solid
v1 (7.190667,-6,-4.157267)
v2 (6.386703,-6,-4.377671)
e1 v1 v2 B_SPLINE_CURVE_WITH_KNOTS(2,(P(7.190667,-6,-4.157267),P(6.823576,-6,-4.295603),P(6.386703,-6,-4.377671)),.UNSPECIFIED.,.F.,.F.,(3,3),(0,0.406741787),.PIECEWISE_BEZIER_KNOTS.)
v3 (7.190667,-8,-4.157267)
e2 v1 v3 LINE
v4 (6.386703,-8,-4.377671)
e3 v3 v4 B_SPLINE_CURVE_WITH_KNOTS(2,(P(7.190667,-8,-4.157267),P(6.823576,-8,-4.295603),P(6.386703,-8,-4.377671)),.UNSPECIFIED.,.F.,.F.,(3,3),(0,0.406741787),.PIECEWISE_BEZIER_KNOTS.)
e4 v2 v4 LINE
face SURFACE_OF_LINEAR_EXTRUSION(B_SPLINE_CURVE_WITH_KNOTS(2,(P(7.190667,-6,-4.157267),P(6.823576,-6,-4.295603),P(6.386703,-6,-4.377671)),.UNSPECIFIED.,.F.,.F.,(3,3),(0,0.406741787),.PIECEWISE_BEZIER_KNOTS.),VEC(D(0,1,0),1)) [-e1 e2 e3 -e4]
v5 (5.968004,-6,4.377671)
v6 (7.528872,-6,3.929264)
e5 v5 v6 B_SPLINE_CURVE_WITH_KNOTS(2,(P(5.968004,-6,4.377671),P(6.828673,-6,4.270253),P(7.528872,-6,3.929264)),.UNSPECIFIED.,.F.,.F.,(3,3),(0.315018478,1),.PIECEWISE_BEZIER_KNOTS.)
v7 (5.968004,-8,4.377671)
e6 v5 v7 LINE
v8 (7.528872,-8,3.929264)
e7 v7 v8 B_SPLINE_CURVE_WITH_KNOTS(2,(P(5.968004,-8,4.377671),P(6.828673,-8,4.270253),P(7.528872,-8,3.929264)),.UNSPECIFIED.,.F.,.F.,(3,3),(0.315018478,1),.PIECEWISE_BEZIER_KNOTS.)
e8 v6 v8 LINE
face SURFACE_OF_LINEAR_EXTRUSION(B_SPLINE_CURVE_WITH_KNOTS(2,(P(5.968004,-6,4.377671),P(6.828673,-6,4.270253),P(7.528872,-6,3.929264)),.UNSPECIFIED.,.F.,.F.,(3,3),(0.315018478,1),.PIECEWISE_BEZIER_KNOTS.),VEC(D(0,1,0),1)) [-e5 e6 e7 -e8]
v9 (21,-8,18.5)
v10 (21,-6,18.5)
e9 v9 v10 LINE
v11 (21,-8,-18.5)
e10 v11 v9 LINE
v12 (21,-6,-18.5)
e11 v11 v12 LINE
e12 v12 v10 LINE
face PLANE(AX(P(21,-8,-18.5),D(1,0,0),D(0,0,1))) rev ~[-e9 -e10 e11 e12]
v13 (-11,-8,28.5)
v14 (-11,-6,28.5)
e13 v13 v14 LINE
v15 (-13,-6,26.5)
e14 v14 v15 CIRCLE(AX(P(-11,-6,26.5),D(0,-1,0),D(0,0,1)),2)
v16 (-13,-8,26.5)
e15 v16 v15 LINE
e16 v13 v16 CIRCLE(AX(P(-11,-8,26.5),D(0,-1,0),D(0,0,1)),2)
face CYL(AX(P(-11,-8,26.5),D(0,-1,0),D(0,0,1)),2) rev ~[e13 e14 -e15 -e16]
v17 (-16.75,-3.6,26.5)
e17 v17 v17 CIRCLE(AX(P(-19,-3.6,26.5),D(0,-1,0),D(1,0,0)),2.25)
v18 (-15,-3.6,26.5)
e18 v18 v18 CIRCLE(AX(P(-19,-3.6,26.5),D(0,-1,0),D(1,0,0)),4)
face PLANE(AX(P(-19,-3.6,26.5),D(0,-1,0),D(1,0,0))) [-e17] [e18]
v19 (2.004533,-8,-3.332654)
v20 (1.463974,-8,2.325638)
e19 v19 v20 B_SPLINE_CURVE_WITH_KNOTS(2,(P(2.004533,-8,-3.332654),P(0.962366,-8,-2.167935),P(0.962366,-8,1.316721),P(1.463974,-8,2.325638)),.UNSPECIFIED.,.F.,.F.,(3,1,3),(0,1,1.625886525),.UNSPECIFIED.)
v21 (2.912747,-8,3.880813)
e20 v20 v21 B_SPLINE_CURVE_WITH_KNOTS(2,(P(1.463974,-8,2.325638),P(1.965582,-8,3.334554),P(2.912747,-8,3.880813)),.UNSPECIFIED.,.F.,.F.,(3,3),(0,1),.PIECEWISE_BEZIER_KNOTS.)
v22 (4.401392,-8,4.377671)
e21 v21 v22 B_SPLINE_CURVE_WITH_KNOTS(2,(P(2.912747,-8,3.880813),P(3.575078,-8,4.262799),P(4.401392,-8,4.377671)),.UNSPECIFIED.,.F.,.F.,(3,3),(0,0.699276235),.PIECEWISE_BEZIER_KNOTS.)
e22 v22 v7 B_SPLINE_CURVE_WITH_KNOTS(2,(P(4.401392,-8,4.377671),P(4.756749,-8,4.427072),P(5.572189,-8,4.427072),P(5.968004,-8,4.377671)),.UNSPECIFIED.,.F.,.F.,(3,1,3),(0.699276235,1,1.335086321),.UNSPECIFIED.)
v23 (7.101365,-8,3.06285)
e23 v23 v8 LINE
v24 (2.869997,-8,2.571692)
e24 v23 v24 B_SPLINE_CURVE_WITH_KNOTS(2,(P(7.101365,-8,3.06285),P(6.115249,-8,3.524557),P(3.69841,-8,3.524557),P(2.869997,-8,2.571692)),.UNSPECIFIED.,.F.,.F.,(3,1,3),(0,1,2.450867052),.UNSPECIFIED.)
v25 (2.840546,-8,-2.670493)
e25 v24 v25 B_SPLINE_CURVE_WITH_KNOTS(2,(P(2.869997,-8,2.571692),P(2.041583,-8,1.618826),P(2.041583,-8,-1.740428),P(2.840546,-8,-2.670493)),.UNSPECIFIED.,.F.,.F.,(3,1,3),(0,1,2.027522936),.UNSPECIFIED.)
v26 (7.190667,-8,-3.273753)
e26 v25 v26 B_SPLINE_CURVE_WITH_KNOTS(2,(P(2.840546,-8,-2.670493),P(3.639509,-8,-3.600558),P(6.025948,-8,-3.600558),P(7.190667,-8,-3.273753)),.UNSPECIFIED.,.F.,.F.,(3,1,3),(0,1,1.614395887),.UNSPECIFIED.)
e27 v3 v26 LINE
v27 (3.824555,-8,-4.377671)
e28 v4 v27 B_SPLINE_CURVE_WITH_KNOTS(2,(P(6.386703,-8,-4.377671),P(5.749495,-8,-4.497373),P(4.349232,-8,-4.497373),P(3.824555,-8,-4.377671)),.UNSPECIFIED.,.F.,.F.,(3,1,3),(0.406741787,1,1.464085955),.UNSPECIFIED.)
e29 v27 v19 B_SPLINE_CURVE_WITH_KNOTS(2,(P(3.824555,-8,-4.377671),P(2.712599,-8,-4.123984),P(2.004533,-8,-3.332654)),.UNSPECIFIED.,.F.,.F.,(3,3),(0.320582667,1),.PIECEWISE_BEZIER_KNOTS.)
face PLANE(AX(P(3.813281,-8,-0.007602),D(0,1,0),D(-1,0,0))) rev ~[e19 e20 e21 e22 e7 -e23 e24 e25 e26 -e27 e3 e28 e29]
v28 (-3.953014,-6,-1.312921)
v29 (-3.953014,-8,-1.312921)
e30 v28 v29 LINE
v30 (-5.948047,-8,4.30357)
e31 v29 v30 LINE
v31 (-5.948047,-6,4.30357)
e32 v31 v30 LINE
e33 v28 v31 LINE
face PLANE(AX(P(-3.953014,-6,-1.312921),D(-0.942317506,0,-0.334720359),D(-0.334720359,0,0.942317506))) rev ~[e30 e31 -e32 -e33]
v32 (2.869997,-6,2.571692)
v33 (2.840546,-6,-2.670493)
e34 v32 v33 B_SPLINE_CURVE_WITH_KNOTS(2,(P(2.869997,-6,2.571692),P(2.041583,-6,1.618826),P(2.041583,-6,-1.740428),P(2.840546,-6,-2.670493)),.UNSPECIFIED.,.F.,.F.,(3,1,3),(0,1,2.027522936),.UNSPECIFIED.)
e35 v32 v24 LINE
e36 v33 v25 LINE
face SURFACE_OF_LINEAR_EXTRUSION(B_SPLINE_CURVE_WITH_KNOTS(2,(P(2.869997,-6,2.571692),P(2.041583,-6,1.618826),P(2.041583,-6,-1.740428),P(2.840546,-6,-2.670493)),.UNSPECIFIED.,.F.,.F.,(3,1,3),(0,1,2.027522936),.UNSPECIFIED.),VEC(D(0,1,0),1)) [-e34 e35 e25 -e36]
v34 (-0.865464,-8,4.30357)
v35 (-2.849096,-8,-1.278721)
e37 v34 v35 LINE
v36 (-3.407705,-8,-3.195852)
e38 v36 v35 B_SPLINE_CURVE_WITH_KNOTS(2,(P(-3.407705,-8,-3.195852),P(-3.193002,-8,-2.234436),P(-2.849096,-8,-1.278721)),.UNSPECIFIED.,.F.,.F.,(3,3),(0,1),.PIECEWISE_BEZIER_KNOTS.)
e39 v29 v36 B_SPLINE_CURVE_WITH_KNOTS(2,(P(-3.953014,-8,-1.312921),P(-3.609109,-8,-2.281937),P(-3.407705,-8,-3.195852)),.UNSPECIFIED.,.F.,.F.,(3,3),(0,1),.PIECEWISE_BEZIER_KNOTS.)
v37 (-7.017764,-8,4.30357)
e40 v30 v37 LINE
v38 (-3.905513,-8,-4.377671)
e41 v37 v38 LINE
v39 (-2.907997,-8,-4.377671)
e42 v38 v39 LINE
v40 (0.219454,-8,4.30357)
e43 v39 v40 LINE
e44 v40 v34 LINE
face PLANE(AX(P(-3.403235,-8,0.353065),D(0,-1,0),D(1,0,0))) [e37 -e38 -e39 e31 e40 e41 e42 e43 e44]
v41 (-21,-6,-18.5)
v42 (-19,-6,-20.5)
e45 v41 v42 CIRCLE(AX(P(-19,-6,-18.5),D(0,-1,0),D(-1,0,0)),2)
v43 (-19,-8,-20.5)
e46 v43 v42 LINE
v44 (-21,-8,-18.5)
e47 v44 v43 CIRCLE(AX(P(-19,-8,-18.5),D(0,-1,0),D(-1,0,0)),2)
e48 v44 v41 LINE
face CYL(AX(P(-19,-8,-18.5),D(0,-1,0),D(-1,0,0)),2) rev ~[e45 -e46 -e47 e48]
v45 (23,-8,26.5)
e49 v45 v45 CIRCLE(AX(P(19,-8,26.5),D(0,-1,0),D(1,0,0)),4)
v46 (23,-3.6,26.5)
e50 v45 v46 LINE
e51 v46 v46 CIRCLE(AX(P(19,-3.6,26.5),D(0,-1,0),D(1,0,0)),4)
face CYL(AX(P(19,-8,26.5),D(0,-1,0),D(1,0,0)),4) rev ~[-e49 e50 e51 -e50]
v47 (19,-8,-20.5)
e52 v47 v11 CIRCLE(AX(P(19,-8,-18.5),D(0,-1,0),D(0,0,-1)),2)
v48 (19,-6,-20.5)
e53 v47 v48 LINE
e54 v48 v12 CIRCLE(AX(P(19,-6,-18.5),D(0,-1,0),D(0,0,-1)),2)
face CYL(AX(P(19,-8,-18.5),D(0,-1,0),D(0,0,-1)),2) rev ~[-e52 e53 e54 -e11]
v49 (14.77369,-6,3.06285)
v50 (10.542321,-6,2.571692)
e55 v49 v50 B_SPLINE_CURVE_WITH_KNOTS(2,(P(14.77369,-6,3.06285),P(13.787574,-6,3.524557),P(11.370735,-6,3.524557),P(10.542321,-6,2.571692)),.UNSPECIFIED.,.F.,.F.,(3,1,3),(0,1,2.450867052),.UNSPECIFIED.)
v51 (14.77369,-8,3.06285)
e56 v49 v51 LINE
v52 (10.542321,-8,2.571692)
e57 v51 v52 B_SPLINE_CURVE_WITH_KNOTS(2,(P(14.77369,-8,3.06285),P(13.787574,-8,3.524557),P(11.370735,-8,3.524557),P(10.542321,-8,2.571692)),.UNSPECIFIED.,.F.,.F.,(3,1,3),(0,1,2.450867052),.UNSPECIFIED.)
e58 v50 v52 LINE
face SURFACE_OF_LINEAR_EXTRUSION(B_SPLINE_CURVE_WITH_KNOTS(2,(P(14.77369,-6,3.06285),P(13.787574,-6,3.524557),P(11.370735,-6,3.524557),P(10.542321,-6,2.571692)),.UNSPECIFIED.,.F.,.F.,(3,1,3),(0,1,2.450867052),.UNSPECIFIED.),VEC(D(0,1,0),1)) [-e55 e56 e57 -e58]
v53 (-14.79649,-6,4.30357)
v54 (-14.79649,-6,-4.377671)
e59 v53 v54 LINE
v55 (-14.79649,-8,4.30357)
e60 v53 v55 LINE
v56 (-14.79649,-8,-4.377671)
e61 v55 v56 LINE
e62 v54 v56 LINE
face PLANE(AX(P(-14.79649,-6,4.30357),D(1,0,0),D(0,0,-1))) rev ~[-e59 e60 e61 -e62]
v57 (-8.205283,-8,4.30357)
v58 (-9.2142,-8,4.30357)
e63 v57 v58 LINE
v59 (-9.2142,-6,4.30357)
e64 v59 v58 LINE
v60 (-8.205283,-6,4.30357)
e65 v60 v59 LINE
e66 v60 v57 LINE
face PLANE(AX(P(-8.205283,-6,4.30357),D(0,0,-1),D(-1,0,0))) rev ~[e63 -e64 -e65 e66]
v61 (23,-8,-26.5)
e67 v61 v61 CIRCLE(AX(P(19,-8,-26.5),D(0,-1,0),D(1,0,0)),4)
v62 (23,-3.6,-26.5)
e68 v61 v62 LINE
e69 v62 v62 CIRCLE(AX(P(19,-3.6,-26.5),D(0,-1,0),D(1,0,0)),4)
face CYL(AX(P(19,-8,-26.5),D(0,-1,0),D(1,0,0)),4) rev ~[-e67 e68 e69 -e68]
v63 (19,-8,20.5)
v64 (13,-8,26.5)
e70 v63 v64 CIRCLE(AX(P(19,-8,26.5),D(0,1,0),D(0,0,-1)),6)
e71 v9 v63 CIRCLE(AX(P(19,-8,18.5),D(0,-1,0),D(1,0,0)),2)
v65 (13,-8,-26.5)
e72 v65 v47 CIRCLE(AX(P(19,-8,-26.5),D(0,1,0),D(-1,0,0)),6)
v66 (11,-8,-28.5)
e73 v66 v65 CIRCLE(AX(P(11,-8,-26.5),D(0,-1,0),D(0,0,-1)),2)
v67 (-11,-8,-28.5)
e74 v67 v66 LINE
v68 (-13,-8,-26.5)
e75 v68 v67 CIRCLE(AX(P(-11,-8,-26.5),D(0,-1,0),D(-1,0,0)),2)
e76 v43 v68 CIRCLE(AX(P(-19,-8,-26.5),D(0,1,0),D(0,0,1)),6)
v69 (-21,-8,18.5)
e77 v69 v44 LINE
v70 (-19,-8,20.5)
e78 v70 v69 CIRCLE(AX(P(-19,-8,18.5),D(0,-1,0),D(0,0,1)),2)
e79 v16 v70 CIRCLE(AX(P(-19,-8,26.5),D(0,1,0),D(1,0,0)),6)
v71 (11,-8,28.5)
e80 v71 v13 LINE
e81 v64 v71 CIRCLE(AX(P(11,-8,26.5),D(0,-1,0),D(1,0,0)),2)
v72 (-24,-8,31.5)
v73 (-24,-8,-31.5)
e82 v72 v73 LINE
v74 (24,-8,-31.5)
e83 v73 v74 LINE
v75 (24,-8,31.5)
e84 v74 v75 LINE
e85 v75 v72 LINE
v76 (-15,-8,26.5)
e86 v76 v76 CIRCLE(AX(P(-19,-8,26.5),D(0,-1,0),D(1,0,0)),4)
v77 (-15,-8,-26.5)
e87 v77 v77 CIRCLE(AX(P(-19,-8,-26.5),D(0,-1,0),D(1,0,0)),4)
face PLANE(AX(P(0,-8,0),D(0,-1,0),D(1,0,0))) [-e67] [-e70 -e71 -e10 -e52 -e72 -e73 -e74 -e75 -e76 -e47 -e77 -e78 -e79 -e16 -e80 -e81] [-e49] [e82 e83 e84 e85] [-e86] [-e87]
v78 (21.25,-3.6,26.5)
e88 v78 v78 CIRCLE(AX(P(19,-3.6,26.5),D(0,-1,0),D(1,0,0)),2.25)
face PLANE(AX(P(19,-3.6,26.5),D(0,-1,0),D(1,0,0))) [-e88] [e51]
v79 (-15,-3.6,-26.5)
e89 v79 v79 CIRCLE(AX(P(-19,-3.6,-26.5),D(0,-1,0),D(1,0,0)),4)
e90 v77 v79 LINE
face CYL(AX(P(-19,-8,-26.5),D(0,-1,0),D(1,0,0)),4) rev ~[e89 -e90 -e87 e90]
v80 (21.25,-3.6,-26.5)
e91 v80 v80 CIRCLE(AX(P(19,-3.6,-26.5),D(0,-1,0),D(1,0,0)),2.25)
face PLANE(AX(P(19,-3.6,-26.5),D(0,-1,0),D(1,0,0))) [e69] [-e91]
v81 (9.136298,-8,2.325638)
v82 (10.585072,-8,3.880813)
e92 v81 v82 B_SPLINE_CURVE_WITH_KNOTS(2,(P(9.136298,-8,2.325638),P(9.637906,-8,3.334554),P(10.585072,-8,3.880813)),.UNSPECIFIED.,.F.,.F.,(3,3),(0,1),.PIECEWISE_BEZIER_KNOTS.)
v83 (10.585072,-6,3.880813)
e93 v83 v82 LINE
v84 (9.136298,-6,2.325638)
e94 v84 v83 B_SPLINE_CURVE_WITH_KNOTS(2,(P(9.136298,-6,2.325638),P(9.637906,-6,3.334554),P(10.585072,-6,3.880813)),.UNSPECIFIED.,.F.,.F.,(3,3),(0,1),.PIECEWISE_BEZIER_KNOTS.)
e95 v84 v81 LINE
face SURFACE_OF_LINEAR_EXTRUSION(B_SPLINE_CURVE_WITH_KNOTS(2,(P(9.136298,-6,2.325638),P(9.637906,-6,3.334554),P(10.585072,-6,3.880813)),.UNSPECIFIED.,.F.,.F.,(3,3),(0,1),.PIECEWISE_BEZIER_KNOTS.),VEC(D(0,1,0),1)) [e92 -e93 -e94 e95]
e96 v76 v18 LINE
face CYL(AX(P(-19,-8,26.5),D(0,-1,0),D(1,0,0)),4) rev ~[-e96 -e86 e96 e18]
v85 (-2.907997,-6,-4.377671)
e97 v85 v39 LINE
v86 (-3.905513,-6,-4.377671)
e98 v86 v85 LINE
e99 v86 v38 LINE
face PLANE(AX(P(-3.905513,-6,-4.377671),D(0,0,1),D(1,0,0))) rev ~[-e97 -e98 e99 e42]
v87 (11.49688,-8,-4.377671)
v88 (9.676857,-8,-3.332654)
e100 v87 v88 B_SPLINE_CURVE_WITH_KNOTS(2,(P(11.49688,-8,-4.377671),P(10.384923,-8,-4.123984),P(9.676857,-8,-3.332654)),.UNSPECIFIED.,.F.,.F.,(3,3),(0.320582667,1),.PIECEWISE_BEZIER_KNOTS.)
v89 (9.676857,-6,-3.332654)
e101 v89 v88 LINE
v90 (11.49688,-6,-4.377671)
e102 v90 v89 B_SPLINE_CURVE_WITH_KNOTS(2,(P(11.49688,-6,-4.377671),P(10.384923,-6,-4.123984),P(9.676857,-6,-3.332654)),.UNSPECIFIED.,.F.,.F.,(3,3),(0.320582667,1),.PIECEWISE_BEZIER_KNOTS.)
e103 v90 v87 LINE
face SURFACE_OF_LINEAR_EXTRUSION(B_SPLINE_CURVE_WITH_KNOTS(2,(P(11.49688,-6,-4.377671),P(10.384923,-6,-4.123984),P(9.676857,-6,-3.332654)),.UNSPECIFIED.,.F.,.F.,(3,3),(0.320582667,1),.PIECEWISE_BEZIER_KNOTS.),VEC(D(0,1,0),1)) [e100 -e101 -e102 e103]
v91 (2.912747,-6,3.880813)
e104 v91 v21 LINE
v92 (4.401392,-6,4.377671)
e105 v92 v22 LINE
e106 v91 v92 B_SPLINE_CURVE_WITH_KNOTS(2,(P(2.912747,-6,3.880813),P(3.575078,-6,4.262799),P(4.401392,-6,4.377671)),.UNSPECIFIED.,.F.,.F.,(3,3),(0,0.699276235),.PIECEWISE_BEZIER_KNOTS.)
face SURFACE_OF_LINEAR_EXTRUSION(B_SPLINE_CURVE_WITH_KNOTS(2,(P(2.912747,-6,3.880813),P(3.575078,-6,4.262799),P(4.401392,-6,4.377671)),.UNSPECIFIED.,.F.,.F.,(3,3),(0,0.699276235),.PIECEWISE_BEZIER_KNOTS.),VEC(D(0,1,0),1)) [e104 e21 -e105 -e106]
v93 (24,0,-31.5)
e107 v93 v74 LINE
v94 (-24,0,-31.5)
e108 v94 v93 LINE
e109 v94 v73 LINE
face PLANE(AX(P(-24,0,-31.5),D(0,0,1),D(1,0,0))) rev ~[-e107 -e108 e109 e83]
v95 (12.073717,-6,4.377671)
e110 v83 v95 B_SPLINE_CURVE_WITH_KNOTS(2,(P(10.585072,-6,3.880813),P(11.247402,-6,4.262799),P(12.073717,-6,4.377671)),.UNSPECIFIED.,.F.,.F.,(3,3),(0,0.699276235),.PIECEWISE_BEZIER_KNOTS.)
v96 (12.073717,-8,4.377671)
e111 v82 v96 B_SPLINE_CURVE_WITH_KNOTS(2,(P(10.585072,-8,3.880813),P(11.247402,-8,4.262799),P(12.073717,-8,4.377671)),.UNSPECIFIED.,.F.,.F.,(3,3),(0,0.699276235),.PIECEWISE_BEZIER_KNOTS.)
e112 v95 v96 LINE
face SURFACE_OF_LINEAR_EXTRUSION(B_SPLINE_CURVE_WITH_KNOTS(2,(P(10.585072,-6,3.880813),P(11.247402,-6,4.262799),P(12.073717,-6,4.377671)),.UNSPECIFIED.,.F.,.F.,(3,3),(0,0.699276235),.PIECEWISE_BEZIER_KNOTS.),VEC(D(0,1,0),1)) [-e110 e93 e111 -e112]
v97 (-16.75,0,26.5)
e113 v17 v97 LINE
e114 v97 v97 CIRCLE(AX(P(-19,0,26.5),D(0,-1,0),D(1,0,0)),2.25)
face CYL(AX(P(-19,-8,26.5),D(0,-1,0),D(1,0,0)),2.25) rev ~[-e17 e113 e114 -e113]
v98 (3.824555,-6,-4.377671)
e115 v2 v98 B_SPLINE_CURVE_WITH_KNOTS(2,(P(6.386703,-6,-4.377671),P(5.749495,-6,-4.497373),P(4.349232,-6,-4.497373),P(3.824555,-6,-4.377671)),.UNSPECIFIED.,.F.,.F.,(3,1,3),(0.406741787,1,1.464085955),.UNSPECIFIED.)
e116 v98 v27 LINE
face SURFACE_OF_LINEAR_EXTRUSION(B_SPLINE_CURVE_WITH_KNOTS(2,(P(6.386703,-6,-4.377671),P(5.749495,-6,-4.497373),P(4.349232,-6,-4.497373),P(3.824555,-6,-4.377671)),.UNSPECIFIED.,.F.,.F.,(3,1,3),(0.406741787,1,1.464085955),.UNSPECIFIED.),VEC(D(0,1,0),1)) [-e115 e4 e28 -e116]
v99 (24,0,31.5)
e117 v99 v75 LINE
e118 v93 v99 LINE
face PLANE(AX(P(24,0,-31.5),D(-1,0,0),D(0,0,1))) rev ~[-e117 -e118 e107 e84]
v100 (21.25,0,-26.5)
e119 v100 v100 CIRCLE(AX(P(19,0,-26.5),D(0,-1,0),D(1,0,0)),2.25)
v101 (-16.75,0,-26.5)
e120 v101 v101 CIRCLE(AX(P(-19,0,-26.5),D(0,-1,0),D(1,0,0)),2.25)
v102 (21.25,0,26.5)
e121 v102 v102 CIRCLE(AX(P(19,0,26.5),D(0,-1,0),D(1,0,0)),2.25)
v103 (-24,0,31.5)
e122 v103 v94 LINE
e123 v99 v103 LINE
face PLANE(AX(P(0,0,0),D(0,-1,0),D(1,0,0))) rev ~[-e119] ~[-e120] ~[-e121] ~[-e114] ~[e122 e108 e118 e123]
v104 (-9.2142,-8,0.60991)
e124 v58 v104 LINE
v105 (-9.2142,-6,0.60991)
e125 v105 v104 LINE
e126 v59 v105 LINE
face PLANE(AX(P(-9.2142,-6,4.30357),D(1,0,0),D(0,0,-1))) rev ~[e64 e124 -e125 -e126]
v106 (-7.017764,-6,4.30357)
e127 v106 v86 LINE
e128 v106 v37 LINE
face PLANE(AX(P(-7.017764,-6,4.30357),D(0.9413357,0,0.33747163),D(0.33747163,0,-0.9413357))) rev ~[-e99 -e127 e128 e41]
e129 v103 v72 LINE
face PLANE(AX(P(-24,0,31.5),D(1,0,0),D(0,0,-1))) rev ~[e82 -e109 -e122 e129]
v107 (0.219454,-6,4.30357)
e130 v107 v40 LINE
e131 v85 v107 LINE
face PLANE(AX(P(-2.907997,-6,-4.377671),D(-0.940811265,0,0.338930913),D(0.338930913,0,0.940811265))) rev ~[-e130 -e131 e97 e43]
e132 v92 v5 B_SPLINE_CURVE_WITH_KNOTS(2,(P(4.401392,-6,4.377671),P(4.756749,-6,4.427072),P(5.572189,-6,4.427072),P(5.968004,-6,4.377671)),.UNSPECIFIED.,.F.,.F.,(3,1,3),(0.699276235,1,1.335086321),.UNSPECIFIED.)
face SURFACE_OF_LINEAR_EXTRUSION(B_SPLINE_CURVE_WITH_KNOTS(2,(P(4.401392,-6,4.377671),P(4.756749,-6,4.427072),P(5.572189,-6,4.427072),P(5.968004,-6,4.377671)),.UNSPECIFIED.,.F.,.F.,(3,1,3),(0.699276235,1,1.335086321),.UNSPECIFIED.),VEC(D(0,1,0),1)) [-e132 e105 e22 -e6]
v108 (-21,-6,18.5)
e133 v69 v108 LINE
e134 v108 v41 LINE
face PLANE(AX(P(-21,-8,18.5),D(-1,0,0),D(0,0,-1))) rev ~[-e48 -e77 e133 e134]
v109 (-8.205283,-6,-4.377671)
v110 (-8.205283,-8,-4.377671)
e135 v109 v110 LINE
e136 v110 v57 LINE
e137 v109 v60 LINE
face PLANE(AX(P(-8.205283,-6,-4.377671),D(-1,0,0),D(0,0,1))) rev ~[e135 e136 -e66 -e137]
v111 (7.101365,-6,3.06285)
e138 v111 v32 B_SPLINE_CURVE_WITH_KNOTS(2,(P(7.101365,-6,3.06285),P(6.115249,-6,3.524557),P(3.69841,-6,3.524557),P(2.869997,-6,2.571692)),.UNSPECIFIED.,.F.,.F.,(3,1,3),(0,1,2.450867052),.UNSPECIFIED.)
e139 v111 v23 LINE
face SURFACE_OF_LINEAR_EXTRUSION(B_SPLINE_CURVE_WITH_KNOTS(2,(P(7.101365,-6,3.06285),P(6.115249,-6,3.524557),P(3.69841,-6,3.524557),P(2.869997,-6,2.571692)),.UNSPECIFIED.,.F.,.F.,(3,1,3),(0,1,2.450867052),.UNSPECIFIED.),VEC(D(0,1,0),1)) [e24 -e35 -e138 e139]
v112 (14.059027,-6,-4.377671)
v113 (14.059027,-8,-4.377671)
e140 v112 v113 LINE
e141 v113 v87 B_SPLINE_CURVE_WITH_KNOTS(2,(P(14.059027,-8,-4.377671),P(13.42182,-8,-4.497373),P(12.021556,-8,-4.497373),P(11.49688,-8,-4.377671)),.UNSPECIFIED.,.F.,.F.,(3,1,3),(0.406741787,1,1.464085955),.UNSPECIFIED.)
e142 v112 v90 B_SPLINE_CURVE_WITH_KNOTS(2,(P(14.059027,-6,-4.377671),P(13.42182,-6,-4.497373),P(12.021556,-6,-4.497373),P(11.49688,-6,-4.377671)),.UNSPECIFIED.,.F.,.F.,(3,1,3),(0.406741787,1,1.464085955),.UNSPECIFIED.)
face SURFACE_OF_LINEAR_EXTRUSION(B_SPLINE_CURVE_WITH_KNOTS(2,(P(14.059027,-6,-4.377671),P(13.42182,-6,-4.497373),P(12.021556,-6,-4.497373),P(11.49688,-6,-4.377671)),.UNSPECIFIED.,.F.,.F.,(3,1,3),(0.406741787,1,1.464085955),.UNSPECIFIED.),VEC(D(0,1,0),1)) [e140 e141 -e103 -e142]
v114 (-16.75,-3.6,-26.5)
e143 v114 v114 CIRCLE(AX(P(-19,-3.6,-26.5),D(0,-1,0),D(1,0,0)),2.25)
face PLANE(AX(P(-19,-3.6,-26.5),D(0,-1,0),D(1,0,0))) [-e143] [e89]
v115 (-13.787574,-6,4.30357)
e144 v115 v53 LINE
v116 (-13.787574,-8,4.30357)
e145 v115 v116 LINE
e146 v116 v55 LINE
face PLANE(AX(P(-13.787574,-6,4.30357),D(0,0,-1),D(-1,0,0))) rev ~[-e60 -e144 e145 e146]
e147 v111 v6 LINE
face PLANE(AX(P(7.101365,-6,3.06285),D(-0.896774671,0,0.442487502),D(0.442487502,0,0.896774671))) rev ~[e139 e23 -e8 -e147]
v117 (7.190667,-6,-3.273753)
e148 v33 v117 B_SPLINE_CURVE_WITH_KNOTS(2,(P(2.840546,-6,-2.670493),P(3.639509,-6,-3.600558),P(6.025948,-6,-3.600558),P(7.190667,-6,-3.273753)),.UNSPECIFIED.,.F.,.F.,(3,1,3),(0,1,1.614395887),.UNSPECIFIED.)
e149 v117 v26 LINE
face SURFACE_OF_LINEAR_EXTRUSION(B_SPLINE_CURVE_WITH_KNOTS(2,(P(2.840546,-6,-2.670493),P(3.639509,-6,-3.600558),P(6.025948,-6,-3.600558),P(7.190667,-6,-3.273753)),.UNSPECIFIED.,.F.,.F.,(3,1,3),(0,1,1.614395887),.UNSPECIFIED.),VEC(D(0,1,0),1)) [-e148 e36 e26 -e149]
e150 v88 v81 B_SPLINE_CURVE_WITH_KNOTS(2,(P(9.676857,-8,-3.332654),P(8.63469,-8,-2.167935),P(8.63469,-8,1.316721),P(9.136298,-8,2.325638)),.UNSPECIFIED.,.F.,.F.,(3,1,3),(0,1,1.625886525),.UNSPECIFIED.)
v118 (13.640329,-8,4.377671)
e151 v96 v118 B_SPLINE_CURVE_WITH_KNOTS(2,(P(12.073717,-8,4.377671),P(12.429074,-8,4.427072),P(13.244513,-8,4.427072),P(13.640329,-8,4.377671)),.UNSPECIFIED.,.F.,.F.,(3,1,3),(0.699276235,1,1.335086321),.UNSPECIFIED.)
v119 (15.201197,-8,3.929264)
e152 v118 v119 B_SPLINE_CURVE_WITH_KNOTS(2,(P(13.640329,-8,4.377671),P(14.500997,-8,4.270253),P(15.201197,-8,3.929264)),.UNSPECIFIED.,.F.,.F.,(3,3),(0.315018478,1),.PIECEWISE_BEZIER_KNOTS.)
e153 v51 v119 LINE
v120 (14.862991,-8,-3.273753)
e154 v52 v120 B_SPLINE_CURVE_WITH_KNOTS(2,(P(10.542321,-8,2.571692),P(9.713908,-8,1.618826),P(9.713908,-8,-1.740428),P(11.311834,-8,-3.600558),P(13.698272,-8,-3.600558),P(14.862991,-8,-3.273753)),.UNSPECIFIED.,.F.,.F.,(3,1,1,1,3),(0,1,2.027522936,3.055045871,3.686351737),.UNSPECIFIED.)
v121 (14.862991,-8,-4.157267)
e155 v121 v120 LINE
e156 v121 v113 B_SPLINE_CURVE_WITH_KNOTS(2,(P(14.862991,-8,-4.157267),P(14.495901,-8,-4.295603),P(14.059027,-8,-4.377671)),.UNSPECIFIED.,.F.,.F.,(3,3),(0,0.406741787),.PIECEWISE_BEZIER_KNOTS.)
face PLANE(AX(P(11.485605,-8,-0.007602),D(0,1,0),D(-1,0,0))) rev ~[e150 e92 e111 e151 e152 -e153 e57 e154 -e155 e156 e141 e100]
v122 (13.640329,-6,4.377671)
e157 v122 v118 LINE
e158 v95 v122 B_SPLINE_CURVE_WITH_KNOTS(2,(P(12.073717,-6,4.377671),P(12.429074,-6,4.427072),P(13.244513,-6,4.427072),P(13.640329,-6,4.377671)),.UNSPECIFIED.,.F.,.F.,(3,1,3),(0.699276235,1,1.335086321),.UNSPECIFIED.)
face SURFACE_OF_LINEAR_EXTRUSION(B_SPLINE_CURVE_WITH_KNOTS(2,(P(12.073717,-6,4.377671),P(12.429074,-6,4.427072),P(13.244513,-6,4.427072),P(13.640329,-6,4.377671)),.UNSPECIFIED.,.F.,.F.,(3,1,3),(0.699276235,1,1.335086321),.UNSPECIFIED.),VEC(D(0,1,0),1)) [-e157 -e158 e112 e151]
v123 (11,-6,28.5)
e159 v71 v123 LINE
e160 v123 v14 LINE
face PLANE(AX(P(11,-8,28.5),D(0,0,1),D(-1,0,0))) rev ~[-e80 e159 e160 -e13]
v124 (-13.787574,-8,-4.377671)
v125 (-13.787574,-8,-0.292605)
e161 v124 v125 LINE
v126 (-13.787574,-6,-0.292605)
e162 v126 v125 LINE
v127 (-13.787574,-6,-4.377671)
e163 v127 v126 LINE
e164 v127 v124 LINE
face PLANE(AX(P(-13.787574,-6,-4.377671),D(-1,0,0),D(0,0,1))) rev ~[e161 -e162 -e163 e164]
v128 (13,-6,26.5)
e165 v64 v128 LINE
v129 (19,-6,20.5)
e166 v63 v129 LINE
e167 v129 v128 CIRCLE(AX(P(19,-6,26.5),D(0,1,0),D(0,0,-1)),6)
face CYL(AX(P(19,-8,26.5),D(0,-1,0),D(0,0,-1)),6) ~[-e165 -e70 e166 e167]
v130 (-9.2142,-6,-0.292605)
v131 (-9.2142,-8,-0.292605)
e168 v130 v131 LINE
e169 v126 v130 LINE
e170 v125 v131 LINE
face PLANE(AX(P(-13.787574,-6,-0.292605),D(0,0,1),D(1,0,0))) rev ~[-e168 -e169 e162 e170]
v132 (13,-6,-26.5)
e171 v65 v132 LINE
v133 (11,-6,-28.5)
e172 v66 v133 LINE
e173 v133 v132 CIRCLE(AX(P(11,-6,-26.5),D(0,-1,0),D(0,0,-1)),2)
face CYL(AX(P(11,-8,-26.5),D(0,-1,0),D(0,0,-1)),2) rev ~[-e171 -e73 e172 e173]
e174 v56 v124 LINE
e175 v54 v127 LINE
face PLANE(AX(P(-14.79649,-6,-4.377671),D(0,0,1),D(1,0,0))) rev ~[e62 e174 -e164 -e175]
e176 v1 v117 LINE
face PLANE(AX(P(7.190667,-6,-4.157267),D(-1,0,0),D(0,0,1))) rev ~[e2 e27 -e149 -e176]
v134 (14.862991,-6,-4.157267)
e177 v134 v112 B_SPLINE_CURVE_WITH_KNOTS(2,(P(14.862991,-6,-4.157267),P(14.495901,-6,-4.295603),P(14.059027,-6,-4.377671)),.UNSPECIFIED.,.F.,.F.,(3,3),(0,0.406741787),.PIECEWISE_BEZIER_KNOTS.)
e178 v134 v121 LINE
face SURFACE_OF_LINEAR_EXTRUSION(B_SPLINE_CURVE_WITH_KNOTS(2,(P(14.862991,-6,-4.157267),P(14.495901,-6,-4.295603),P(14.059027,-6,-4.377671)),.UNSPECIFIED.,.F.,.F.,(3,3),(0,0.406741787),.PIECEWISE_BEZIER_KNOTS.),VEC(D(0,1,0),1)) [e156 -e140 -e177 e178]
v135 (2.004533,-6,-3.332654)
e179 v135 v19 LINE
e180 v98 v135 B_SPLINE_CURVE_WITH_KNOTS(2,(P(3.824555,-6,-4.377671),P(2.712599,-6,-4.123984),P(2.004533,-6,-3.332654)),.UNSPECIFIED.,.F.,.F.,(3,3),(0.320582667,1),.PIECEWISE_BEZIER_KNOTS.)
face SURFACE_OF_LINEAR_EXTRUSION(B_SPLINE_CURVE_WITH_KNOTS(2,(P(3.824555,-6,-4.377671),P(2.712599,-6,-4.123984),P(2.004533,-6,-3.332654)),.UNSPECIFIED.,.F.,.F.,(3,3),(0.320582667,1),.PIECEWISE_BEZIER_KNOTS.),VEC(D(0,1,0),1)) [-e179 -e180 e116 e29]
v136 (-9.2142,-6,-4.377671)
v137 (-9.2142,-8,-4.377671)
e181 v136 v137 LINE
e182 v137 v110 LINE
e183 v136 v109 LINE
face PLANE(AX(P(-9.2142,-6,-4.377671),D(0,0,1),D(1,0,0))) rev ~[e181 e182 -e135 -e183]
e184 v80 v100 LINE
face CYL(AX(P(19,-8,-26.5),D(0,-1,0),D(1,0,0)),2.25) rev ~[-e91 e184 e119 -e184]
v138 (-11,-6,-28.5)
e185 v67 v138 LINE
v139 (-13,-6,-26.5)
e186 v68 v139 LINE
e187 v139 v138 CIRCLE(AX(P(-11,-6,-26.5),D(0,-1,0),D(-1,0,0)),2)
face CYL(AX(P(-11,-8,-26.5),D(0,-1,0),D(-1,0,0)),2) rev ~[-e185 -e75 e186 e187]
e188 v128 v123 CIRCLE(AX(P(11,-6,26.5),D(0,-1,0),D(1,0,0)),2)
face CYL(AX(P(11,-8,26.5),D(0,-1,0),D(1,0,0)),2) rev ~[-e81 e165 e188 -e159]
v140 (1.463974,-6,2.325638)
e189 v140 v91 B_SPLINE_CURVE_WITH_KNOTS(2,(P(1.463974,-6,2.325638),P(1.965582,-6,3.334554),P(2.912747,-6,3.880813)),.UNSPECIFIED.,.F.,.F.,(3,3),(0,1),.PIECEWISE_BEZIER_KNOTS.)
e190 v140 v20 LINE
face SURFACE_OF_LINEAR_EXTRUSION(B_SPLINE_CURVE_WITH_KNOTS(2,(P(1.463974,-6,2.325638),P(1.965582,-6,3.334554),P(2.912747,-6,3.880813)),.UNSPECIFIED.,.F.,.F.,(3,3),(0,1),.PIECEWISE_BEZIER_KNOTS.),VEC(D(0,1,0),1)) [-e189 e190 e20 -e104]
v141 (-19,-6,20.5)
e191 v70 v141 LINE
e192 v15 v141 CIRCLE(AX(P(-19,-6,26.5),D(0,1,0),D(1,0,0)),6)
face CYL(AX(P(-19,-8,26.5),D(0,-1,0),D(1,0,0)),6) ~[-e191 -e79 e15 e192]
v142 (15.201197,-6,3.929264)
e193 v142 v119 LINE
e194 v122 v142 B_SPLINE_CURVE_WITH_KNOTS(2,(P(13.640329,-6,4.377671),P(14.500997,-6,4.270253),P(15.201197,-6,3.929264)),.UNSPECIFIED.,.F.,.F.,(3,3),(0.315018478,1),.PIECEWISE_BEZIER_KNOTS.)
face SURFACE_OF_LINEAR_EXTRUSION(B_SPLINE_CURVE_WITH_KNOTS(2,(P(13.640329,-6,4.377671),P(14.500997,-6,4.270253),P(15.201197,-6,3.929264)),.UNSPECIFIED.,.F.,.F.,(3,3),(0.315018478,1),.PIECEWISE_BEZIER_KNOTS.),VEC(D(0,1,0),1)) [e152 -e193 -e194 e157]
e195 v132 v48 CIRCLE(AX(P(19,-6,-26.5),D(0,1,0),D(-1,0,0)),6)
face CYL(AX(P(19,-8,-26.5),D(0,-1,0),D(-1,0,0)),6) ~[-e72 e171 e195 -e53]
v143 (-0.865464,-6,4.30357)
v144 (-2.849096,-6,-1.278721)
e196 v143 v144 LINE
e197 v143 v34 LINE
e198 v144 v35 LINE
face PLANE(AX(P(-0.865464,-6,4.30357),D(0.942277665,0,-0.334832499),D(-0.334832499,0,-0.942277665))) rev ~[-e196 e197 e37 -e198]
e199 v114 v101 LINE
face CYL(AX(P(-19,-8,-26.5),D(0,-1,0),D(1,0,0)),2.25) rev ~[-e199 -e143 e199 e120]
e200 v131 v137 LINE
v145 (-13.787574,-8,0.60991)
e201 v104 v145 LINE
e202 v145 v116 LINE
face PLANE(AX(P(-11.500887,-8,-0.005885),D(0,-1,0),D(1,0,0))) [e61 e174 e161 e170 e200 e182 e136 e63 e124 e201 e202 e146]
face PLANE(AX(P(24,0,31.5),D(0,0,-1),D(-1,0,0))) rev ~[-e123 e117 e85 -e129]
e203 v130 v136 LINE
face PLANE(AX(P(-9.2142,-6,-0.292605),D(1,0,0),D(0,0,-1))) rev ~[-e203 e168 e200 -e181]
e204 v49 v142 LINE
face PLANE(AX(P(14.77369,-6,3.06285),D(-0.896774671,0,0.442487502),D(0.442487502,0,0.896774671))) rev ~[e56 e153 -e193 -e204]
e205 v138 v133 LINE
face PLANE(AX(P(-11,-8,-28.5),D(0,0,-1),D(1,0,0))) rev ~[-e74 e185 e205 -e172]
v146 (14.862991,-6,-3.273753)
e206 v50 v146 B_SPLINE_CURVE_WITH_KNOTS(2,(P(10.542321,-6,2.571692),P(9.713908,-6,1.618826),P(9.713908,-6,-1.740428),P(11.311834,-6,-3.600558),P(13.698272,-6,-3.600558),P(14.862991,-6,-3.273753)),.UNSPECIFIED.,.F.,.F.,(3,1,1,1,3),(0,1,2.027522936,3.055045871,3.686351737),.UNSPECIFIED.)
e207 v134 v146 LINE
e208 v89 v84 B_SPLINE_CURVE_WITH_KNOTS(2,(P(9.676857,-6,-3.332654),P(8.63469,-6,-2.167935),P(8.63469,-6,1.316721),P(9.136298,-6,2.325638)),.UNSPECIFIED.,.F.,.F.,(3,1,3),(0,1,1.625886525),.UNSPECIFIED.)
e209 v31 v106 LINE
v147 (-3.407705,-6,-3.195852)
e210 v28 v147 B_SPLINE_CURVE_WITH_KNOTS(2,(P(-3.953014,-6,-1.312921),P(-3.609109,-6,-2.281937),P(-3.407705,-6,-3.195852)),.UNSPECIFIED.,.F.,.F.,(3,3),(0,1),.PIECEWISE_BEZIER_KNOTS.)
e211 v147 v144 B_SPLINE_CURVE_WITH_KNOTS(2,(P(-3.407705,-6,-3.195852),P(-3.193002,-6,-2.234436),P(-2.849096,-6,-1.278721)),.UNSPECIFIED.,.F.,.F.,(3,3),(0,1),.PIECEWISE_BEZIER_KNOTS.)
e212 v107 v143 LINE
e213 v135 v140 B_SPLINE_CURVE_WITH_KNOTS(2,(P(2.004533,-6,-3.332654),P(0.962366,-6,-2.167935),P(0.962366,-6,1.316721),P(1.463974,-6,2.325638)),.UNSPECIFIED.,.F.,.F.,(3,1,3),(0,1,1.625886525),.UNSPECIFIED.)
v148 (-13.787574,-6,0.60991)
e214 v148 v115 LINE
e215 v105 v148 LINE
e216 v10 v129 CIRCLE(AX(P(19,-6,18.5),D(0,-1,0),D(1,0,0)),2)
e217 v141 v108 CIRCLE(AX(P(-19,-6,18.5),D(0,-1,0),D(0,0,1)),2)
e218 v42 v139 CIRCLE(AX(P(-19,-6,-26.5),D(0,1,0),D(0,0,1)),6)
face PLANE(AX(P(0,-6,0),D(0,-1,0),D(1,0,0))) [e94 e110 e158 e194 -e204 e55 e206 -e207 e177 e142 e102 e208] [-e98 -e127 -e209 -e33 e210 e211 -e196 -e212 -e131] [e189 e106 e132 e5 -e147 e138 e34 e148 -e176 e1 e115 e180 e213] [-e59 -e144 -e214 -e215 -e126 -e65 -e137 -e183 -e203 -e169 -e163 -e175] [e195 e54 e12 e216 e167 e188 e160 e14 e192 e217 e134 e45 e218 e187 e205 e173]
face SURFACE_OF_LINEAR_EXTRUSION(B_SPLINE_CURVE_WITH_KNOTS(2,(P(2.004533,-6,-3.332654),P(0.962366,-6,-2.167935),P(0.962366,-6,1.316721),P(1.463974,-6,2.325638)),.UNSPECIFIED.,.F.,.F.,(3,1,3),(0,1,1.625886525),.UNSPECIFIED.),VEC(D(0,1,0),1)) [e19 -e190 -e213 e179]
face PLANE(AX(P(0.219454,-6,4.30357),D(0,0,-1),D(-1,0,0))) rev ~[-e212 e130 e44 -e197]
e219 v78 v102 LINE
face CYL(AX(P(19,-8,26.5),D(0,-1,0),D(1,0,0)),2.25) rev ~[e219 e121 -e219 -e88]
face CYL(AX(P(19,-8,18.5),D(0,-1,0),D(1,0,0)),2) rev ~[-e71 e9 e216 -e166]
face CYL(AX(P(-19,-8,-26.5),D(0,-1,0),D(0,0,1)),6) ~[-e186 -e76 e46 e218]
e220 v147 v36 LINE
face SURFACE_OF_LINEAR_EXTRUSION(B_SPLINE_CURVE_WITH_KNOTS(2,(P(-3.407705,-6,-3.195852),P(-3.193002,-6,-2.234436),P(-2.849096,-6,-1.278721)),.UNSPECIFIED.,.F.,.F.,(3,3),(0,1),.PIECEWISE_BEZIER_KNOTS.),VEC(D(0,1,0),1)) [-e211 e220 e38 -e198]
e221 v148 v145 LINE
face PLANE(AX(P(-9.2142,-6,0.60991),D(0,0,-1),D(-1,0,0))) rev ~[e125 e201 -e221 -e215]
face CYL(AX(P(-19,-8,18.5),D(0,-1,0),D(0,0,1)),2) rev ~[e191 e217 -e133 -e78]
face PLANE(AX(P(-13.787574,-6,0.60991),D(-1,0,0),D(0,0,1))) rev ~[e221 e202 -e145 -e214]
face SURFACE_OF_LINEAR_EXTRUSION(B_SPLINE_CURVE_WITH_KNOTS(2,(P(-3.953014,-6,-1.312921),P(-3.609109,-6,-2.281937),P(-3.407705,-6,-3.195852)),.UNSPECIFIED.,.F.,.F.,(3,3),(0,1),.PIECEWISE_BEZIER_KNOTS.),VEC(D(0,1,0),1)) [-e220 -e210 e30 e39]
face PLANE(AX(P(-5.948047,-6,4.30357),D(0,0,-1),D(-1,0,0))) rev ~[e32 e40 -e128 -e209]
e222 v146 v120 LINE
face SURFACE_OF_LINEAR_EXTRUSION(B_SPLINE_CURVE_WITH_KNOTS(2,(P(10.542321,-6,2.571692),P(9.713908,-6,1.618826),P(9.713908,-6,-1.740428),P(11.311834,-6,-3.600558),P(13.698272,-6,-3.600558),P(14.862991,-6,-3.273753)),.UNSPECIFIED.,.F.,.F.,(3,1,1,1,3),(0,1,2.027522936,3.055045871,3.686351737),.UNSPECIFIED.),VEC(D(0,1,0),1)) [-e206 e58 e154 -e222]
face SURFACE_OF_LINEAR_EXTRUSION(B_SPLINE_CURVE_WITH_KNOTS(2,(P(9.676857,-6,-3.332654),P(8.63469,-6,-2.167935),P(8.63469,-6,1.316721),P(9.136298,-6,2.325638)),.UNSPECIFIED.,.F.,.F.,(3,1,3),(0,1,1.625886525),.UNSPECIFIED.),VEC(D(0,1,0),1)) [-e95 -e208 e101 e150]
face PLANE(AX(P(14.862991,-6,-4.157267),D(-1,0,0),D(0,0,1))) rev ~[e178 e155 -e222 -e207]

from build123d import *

# Parameters (mm, degrees)
F1_DEPTH  = 8
F2_R      = 2.25
F3_DEPTH  = 2
F5_DEPTH  = 2
F7_DEPTH  = 2
F2_R_2    = 4
F8_DEPTH  = 4.4
F9_DEPTH  = 8.001
F10_DEPTH = 8.001
F11_DEPTH = 4.4


# Not quite as in the source:
# - a feature names something its author has since deleted; it is built from what else it names


with BuildPart() as f1:
    # F0 (on Front) → F1 (new body)
    with BuildSketch(Plane.XZ):
        Polygon((24, 31.5), (0, 31.5), (-24, 31.5), (-24, -31.5), (0, -31.5), (24, -31.5), align=None)
    extrude(amount=F1_DEPTH)

    # F2 (on face) → F3 (cut)
    with BuildSketch(Plane.XZ.offset(8)):
        with Locations((-19, 26.5)):
            Circle(F2_R)
        with Locations((19, 26.5)):
            Circle(F2_R)
    extrude(amount=-F3_DEPTH, mode=Mode.SUBTRACT)

    # F4 (on face) → F5 (cut)
    with BuildSketch(Plane.XZ.offset(8)):
        with BuildLine():
            Line((-11, -28.5), (0, -28.5))
            Line((0, -28.5), (11, -28.5))
            ThreePointArc((11, -28.5), (12.4142135624, -27.9142135624), (13, -26.5))
            ThreePointArc((13, -26.5), (14.7573593129, -22.2573593129), (19, -20.5))
            ThreePointArc((19, -20.5), (20.4142135624, -19.9142135624), (21, -18.5))
            Line((21, -18.5), (21, 0))
            Line((21, 0), (21, 18.5))
            ThreePointArc((21, 18.5), (20.4142135624, 19.9142135624), (19, 20.5))
            ThreePointArc((19, 20.5), (14.7573593129, 22.2573593129), (13, 26.5))
            ThreePointArc((13, 26.5), (12.4142135624, 27.9142135624), (11, 28.5))
            Line((11, 28.5), (0, 28.5))
            Line((0, 28.5), (-11, 28.5))
            ThreePointArc((-11, 28.5), (-12.4142135624, 27.9142135624), (-13, 26.5))
            ThreePointArc((-13, 26.5), (-14.7573593129, 22.2573593129), (-19, 20.5))
            ThreePointArc((-19, 20.5), (-20.4142135624, 19.9142135624), (-21, 18.5))
            Line((-21, 18.5), (-21, 0))
            Line((-21, 0), (-21, -18.5))
            ThreePointArc((-21, -18.5), (-20.4142135624, -19.9142135624), (-19, -20.5))
            ThreePointArc((-19, -20.5), (-14.7573593129, -22.2573593129), (-13, -26.5))
            ThreePointArc((-13, -26.5), (-12.4142135624, -27.9142135624), (-11, -28.5))
        make_face()
    extrude(amount=-F5_DEPTH, mode=Mode.SUBTRACT)

    # F6 (on face) → F7 (join)
    with BuildSketch(Plane.XZ.offset(6)):
        Polygon((-9.214199551, -4.3776710518), (-8.2052831758, -4.3776710518), (-8.2052831758, 4.3035698491), (-9.214199551, 4.3035698491), (-9.214199551, 0.6099098991), (-13.7875737792, 0.6099098991), (-13.7875737792, 4.3035698491), (-14.7964901544, 4.3035698491), (-14.7964901544, -4.3776710518), (-13.7875737792, -4.3776710518), (-13.7875737792, -0.2926047491), (-9.214199551, -0.2926047491), align=None)
        with BuildLine():
            Line((-3.9055133884, -4.3776710518), (-2.9079971982, -4.3776710518))
            Line((-2.9079971982, -4.3776710518), (0.2194535618, 4.3035698491))
            Line((0.2194535618, 4.3035698491), (-0.8654640469, 4.3035698491))
            Line((-0.8654640469, 4.3035698491), (-2.8490962422, -1.2787207543))
            add(Edge.make_bspline(
                [(-3.4077053087, -3.1958518703), (-3.193001824, -2.234436266), (-2.8490962422, -1.2787207543)],
                knots=[0, 0, 0, 1, 1, 1], degree=2))
            add(Edge.make_bspline(
                [(-3.9530141594, -1.3129213094), (-3.6091085776, -2.281937037), (-3.4077053087, -3.1958518703)],
                knots=[0, 0, 0, 1, 1, 1], degree=2))
            Line((-3.9530141594, -1.3129213094), (-5.9480465397, 4.3035698491))
            Line((-5.9480465397, 4.3035698491), (-7.0177639018, 4.3035698491))
            Line((-7.0177639018, 4.3035698491), (-3.9055133884, -4.3776710518))
        make_face()
        with BuildLine():
            add(Edge.make_bspline(
                [(3.8245554648, -4.3776710518), (2.7125988005, -4.1239843021), (2.0045325346, -3.3326540906)],
                knots=[0.3205826669, 0.3205826669, 0.3205826669, 1, 1, 1], degree=2))
            Line((3.8245554648, -4.3776710518), (6.3867026136, -4.3776710518))
            add(Edge.make_bspline(
                [(7.1906667081, -4.1572674745), (6.8235762872, -4.2956026015), (6.3867026136, -4.3776710518)],
                knots=[0, 0, 0, 0.406741787, 0.406741787, 0.406741787], degree=2))
            Line((7.1906667081, -4.1572674745), (7.1906667081, -3.2737531346))
            add(Edge.make_bspline(
                [(5.1177330633, -3.6005584388), (6.0259478041, -3.6005584388), (7.1906667081, -3.2737531346)],
                knots=[0, 0, 0, 1, 1, 1], degree=2))
            add(Edge.make_bspline(
                [(2.8405461035, -2.6704933434), (3.639509071, -3.6005584388), (5.1177330633, -3.6005584388)],
                knots=[0, 0, 0, 1, 1, 1], degree=2))
            add(Edge.make_bspline(
                [(2.0415831359, -0.0380006168), (2.0415831359, -1.740428248), (2.8405461035, -2.6704933434)],
                knots=[0, 0, 0, 1, 1, 1], degree=2))
            add(Edge.make_bspline(
                [(2.8699965815, 2.5716917398), (2.0415831359, 1.6188262744), (2.0415831359, -0.0380006168)],
                knots=[0, 0, 0, 1, 1, 1], degree=2))
            add(Edge.make_bspline(
                [(5.1291332484, 3.5245572053), (3.698410027, 3.5245572053), (2.8699965815, 2.5716917398)],
                knots=[0, 0, 0, 1, 1, 1], degree=2))
            add(Edge.make_bspline(
                [(7.1013652587, 3.0628497116), (6.1152492535, 3.5245572053), (5.1291332484, 3.5245572053)],
                knots=[0, 0, 0, 1, 1, 1], degree=2))
            Line((7.1013652587, 3.0628497116), (7.5288721973, 3.9292637739))
            add(Edge.make_bspline(
                [(5.9680043466, 4.3776710518), (6.8286727205, 4.2702531102), (7.5288721973, 3.9292637739)],
                knots=[0.3150184776, 0.3150184776, 0.3150184776, 1, 1, 1], degree=2))
            Line((5.9680043466, 4.3776710518), (4.4013922849, 4.3776710518))
            add(Edge.make_bspline(
                [(2.9127472753, 3.8808129875), (3.5750775116, 4.2627988309), (4.4013922849, 4.3776710518)],
                knots=[0, 0, 0, 0.6992762354, 0.6992762354, 0.6992762354], degree=2))
            add(Edge.make_bspline(
                [(1.463973761, 2.3256377463), (1.9655819024, 3.3345541215), (2.9127472753, 3.8808129875)],
                knots=[0, 0, 0, 1, 1, 1], degree=2))
            add(Edge.make_bspline(
                [(0.9623656197, -0.0247004009), (0.9623656197, 1.316721371), (1.463973761, 2.3256377463)],
                knots=[0, 0, 0, 1, 1, 1], degree=2))
            add(Edge.make_bspline(
                [(2.0045325346, -3.3326540906), (0.9623656197, -2.1679351867), (0.9623656197, -0.0247004009)],
                knots=[0, 0, 0, 1, 1, 1], degree=2))
        make_face()
        with BuildLine():
            add(Edge.make_bspline(
                [(11.4968799904, -4.3776710518), (10.3849233261, -4.1239843021), (9.6768570602, -3.3326540906)],
                knots=[0.3205826669, 0.3205826669, 0.3205826669, 1, 1, 1], degree=2))
            Line((11.4968799904, -4.3776710518), (14.0590271393, -4.3776710518))
            add(Edge.make_bspline(
                [(14.8629912337, -4.1572674745), (14.4959008129, -4.2956026015), (14.0590271393, -4.3776710518)],
                knots=[0, 0, 0, 0.406741787, 0.406741787, 0.406741787], degree=2))
            Line((14.8629912337, -4.1572674745), (14.8629912337, -3.2737531346))
            add(Edge.make_bspline(
                [(12.790057589, -3.6005584388), (13.6982723297, -3.6005584388), (14.8629912337, -3.2737531346)],
                knots=[0, 0, 0, 1, 1, 1], degree=2))
            add(Edge.make_bspline(
                [(10.5128706291, -2.6704933434), (11.3118335967, -3.6005584388), (12.790057589, -3.6005584388)],
                knots=[0, 0, 0, 1, 1, 1], degree=2))
            add(Edge.make_bspline(
                [(9.7139076615, -0.0380006168), (9.7139076615, -1.740428248), (10.5128706291, -2.6704933434)],
                knots=[0, 0, 0, 1, 1, 1], degree=2))
            add(Edge.make_bspline(
                [(10.5423211071, 2.5716917398), (9.7139076615, 1.6188262744), (9.7139076615, -0.0380006168)],
                knots=[0, 0, 0, 1, 1, 1], degree=2))
            add(Edge.make_bspline(
                [(12.801457774, 3.5245572053), (11.3707345527, 3.5245572053), (10.5423211071, 2.5716917398)],
                knots=[0, 0, 0, 1, 1, 1], degree=2))
            add(Edge.make_bspline(
                [(14.7736897843, 3.0628497116), (13.7875737792, 3.5245572053), (12.801457774, 3.5245572053)],
                knots=[0, 0, 0, 1, 1, 1], degree=2))
            Line((14.7736897843, 3.0628497116), (15.201196723, 3.9292637739))
            add(Edge.make_bspline(
                [(13.6403288722, 4.3776710518), (14.5009972462, 4.2702531102), (15.201196723, 3.9292637739)],
                knots=[0.3150184776, 0.3150184776, 0.3150184776, 1, 1, 1], degree=2))
            Line((13.6403288722, 4.3776710518), (12.0737168105, 4.3776710518))
            add(Edge.make_bspline(
                [(10.585071801, 3.8808129875), (11.2474020372, 4.2627988309), (12.0737168105, 4.3776710518)],
                knots=[0, 0, 0, 0.6992762354, 0.6992762354, 0.6992762354], degree=2))
            add(Edge.make_bspline(
                [(9.1362982866, 2.3256377463), (9.637906428, 3.3345541215), (10.585071801, 3.8808129875)],
                knots=[0, 0, 0, 1, 1, 1], degree=2))
            add(Edge.make_bspline(
                [(8.6346901453, -0.0247004009), (8.6346901453, 1.316721371), (9.1362982866, 2.3256377463)],
                knots=[0, 0, 0, 1, 1, 1], degree=2))
            add(Edge.make_bspline(
                [(9.6768570602, -3.3326540906), (8.6346901453, -2.1679351867), (8.6346901453, -0.0247004009)],
                knots=[0, 0, 0, 1, 1, 1], degree=2))
        make_face()
        with BuildLine():
            Line((6.3867026136, -4.3776710518), (3.8245554648, -4.3776710518))
            add(Edge.make_bspline(
                [(4.9638305654, -4.4973729946), (4.3492315594, -4.4973729946), (3.8245554648, -4.3776710518)],
                knots=[0, 0, 0, 0.3205826669, 0.3205826669, 0.3205826669], degree=2))
            add(Edge.make_bspline(
                [(6.3867026136, -4.3776710518), (5.7494951686, -4.4973729946), (4.9638305654, -4.4973729946)],
                knots=[0.406741787, 0.406741787, 0.406741787, 1, 1, 1], degree=2))
        make_face()
        with BuildLine():
            Line((14.0590271393, -4.3776710518), (11.4968799904, -4.3776710518))
            add(Edge.make_bspline(
                [(12.6361550911, -4.4973729946), (12.0215560851, -4.4973729946), (11.4968799904, -4.3776710518)],
                knots=[0, 0, 0, 0.3205826669, 0.3205826669, 0.3205826669], degree=2))
            add(Edge.make_bspline(
                [(14.0590271393, -4.3776710518), (13.4218196942, -4.4973729946), (12.6361550911, -4.4973729946)],
                knots=[0.406741787, 0.406741787, 0.406741787, 1, 1, 1], degree=2))
        make_face()
        with BuildLine():
            add(Edge.make_bspline(
                [(4.4013922849, 4.3776710518), (4.7567489763, 4.4270718536), (5.1424334642, 4.4270718536)],
                knots=[0.6992762354, 0.6992762354, 0.6992762354, 1, 1, 1], degree=2))
            Line((4.4013922849, 4.3776710518), (5.9680043466, 4.3776710518))
            add(Edge.make_bspline(
                [(5.1424334642, 4.4270718536), (5.5721886465, 4.4270718536), (5.9680043466, 4.3776710518)],
                knots=[0, 0, 0, 0.3150184776, 0.3150184776, 0.3150184776], degree=2))
        make_face()
        with BuildLine():
            Line((12.0737168105, 4.3776710518), (13.6403288722, 4.3776710518))
            add(Edge.make_bspline(
                [(12.8147579899, 4.4270718536), (13.2445131721, 4.4270718536), (13.6403288722, 4.3776710518)],
                knots=[0, 0, 0, 0.3150184776, 0.3150184776, 0.3150184776], degree=2))
            add(Edge.make_bspline(
                [(12.0737168105, 4.3776710518), (12.4290735019, 4.4270718536), (12.8147579899, 4.4270718536)],
                knots=[0.6992762354, 0.6992762354, 0.6992762354, 1, 1, 1], degree=2))
        make_face()
    extrude(amount=F7_DEPTH)

    # F2 (on face) → F8 (cut)
    with BuildSketch(Plane.XZ.offset(8)):
        with Locations((-19, 26.5)):
            Circle(F2_R_2)
        with Locations((-19, 26.5)):
            Circle(F2_R, mode=Mode.SUBTRACT)
        with Locations((19, 26.5)):
            Circle(F2_R_2)
        with Locations((19, 26.5)):
            Circle(F2_R, mode=Mode.SUBTRACT)
    extrude(amount=-F8_DEPTH, mode=Mode.SUBTRACT)

    # F2 (on face) → F9 (cut, through all)
    with BuildSketch(Plane.XZ.offset(8)):
        with Locations((-19, 26.5)):
            Circle(F2_R)
        with Locations((19, 26.5)):
            Circle(F2_R)
    extrude(amount=-F9_DEPTH, mode=Mode.SUBTRACT)

    # F2 (on face) → F10 (cut, through all)
    with BuildSketch(Plane.XZ.offset(8)):
        with Locations((-19, -26.5)):
            Circle(F2_R)
        with Locations((19, -26.5)):
            Circle(F2_R)
    extrude(amount=-F10_DEPTH, mode=Mode.SUBTRACT)

    # F2 (on face) → F11 (cut)
    with BuildSketch(Plane.XZ.offset(8)):
        with Locations((-19, -26.5)):
            Circle(F2_R_2)
        with Locations((-19, -26.5)):
            Circle(F2_R, mode=Mode.SUBTRACT)
        with Locations((19, -26.5)):
            Circle(F2_R_2)
        with Locations((19, -26.5)):
            Circle(F2_R, mode=Mode.SUBTRACT)
    extrude(amount=-F11_DEPTH, mode=Mode.SUBTRACT)


solid = f1.part
